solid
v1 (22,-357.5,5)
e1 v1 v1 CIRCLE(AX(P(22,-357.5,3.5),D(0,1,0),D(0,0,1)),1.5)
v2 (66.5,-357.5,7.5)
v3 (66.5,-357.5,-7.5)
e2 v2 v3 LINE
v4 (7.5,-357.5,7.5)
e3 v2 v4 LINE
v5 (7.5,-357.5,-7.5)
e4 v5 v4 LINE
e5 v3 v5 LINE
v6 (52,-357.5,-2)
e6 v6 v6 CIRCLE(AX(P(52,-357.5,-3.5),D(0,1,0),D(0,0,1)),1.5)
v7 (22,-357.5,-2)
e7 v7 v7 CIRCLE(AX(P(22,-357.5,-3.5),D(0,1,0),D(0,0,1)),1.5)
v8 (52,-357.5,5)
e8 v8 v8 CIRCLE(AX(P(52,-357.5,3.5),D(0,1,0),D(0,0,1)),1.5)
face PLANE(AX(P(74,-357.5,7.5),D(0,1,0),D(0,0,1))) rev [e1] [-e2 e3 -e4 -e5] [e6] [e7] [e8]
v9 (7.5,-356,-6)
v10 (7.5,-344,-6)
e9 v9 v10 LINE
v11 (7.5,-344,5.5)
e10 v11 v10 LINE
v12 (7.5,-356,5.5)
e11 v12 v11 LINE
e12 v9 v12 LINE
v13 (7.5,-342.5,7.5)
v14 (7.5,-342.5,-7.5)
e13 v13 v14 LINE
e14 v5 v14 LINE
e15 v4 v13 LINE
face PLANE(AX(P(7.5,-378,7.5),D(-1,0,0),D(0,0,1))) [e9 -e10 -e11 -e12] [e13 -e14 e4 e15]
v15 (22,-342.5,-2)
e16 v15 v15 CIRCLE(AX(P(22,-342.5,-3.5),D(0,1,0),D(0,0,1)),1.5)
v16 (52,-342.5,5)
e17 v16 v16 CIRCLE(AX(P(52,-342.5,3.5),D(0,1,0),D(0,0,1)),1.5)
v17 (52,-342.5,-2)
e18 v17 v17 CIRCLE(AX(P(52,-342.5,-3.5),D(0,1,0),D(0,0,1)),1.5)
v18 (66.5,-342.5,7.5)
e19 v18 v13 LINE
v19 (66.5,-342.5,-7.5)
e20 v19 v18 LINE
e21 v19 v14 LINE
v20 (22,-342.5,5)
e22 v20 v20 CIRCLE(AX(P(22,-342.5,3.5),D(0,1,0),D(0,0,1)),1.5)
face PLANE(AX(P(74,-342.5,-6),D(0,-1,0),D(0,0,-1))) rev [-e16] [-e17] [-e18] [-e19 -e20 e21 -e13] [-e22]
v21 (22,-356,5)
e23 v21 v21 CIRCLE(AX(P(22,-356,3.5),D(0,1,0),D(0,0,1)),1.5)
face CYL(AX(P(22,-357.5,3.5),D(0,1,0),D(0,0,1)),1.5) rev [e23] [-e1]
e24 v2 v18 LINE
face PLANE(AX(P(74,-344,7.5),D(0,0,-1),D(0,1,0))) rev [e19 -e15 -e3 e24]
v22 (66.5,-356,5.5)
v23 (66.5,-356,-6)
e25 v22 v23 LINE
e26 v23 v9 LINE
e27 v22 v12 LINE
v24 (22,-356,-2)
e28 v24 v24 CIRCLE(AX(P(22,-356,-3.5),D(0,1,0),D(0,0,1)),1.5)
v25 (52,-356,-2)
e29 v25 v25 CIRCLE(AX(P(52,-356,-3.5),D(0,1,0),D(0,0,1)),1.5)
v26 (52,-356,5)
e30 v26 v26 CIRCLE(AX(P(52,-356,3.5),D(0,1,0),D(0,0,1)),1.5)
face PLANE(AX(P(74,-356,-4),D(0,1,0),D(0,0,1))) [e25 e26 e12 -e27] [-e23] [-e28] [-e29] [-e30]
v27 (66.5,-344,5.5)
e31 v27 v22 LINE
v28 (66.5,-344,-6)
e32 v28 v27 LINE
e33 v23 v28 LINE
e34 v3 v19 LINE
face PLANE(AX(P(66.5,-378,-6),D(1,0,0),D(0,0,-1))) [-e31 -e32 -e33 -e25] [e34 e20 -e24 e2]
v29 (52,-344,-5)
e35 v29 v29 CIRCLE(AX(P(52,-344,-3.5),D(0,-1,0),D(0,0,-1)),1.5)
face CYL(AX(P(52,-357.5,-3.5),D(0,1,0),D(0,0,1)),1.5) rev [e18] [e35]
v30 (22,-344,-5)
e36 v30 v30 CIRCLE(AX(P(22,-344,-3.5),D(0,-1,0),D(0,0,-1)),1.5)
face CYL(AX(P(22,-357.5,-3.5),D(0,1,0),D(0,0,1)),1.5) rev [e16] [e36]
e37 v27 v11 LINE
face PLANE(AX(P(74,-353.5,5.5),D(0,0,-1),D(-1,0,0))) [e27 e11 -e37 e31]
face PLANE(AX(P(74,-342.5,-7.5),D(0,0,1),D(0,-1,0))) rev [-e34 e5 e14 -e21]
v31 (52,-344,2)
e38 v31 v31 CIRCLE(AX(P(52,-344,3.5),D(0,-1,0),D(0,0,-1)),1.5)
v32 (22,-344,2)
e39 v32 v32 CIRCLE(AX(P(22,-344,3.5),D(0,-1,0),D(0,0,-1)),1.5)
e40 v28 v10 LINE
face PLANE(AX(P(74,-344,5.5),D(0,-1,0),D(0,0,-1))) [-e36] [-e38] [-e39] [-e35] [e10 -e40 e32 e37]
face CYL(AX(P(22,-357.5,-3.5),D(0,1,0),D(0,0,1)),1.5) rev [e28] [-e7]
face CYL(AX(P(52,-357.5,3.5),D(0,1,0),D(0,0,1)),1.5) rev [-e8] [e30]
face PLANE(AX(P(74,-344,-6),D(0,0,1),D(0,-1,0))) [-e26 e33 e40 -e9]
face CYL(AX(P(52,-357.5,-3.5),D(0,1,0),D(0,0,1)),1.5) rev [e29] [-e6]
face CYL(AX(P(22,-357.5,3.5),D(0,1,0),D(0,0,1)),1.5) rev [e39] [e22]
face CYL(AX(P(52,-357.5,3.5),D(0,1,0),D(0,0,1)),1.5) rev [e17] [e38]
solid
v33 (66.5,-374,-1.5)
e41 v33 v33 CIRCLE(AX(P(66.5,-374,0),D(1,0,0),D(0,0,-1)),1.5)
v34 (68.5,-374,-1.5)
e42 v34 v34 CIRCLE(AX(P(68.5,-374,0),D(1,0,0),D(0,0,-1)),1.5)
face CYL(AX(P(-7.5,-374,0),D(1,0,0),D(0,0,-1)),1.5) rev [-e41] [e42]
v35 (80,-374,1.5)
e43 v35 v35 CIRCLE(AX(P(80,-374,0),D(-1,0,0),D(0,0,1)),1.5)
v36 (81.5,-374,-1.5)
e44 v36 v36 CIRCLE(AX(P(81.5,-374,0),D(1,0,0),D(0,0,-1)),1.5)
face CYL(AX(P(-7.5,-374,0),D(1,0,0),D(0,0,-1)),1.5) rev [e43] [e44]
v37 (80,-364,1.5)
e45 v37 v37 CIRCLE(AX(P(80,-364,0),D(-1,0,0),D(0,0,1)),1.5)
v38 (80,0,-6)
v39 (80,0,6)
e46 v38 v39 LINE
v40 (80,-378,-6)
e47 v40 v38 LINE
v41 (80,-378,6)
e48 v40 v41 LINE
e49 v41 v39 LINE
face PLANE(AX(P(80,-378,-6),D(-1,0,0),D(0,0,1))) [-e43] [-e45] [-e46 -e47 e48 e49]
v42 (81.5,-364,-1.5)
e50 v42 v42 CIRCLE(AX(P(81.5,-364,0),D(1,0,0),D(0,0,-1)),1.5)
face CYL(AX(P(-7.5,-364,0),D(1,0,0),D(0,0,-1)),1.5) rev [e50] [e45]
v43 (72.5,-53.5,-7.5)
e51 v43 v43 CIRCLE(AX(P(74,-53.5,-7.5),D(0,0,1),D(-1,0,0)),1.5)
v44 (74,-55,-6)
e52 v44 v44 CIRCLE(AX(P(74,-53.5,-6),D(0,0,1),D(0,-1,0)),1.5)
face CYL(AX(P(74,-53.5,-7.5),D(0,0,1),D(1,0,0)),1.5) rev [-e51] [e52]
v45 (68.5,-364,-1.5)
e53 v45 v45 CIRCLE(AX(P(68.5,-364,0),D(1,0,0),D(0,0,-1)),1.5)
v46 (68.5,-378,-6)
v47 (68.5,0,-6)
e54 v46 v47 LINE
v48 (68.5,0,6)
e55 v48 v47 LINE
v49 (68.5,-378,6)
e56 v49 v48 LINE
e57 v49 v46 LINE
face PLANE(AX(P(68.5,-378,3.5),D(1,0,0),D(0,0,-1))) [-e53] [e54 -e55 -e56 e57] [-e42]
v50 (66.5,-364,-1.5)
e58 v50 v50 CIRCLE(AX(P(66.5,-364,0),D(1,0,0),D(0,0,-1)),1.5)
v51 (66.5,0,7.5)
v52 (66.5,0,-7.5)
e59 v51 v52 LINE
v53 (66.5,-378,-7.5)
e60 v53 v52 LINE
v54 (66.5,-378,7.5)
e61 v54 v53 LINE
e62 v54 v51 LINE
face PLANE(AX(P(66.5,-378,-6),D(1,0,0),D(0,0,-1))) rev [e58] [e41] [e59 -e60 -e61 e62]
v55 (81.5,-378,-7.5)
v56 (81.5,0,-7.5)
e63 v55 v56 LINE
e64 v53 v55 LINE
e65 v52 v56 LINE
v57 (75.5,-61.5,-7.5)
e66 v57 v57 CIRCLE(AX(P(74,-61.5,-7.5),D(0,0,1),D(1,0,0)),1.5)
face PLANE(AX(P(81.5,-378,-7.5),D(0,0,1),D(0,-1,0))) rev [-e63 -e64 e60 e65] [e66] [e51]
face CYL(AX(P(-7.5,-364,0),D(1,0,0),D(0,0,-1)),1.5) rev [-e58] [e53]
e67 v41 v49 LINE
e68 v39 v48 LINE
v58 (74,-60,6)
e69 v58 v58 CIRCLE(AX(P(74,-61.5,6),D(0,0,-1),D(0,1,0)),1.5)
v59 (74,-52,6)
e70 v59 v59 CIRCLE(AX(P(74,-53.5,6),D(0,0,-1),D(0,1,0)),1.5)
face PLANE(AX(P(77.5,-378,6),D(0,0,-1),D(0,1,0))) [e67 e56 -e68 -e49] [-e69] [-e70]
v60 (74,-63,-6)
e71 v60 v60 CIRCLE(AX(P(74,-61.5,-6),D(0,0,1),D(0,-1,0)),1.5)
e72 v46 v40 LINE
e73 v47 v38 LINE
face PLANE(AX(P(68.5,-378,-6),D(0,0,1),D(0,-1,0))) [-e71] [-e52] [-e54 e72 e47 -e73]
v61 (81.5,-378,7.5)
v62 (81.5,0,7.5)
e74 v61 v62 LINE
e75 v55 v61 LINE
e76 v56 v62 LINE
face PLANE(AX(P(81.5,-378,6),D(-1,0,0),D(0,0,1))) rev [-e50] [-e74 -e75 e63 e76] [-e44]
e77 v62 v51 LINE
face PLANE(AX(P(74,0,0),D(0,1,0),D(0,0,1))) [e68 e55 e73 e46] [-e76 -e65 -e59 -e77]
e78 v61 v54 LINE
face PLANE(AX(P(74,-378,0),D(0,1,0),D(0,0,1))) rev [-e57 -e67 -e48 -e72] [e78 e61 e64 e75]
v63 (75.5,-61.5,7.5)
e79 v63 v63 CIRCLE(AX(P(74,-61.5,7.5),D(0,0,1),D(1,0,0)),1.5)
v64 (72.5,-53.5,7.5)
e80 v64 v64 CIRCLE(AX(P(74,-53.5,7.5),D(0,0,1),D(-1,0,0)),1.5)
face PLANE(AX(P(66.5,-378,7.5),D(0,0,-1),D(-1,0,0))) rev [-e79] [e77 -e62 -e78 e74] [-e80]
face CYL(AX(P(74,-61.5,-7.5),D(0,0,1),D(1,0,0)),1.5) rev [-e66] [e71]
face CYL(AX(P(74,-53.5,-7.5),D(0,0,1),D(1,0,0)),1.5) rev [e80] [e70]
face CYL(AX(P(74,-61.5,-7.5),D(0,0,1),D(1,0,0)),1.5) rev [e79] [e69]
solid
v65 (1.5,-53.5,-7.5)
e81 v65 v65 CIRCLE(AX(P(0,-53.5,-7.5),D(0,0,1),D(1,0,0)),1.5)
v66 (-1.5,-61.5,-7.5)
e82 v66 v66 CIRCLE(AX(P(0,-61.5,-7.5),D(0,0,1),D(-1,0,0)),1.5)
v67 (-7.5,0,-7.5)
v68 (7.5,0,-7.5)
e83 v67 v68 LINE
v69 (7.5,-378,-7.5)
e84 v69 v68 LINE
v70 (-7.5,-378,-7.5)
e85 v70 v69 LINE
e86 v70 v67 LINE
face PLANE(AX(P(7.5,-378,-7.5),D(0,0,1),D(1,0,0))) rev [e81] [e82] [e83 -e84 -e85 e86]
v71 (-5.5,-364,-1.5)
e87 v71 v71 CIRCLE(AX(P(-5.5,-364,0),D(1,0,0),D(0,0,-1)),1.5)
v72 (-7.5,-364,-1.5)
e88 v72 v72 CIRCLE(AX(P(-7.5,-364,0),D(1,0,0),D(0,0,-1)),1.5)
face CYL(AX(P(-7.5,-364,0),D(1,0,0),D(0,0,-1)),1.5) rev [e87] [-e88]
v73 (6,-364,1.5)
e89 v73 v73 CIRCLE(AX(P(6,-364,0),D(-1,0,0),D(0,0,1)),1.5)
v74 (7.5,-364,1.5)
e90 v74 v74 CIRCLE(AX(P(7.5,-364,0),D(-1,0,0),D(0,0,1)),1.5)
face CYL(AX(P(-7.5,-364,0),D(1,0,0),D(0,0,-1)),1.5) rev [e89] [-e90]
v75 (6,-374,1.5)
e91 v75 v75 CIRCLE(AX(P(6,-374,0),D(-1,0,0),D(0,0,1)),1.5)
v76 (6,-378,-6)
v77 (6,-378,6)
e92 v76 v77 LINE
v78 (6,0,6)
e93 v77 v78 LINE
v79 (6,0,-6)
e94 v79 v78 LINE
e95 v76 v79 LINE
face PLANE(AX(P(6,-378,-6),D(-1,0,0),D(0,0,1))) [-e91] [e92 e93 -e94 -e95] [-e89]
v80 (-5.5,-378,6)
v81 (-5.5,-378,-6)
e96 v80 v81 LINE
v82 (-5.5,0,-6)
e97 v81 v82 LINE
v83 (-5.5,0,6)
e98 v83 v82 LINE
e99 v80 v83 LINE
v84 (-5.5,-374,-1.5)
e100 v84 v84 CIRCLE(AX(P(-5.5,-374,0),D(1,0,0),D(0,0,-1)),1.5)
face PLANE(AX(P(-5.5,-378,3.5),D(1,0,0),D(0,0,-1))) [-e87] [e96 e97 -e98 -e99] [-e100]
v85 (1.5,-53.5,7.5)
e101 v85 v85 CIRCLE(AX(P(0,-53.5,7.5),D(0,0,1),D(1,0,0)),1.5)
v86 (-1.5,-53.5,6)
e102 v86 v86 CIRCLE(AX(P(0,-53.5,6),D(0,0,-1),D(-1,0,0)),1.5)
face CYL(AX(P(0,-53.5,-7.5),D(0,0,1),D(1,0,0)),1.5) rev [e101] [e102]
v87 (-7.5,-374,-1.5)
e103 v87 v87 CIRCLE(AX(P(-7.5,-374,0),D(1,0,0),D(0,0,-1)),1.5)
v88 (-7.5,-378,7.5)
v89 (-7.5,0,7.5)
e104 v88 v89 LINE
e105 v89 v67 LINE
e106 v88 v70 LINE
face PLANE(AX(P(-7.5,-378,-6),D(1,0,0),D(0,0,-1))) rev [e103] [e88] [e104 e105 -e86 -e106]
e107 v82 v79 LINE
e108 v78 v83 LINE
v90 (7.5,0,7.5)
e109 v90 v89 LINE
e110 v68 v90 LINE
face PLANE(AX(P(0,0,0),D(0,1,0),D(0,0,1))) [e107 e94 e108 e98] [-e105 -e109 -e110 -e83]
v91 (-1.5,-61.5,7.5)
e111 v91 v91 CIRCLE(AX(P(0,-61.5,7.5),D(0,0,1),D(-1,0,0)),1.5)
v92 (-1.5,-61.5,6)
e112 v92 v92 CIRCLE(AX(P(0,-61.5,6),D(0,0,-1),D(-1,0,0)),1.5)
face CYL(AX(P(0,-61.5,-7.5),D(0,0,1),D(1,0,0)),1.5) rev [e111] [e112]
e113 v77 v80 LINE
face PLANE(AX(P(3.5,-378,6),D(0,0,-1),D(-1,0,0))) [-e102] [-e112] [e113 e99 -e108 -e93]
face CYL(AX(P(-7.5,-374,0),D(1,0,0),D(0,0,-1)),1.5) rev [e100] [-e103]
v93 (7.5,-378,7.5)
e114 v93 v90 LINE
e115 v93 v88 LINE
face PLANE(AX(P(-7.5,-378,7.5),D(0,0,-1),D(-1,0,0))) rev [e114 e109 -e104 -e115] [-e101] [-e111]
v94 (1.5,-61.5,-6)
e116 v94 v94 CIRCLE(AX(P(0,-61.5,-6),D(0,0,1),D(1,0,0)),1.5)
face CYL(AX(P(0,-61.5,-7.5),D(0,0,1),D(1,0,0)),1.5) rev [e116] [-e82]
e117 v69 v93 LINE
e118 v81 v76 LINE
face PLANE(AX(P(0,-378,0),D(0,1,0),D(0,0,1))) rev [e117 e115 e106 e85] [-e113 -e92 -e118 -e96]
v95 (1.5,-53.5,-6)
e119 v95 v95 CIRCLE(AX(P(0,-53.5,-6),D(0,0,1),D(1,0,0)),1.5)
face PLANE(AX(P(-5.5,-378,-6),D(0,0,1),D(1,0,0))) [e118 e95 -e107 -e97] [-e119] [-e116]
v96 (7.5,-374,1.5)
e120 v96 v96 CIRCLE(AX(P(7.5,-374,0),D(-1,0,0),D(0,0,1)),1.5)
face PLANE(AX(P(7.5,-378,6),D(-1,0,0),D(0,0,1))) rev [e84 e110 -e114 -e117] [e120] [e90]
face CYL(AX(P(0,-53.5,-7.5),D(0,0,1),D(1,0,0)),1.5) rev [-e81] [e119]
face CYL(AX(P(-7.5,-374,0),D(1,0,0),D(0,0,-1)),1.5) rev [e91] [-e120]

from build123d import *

# Parameters (mm, degrees)
MEMBER_START                     = -357.5
MEMBER_15_15_1_5_1_OUTLINE_W     = 59
MEMBER_15_15_1_5_1_OUTLINE_H     = 1.5
MEMBER_15_15_1_5_1_OUTLINE_H_2   = 2
MEMBER_15_15_1_5_1_DEPTH         = 15
MEMBER_15_15_1_5_1_2_OUTLINE_W   = 59
MEMBER_15_15_1_5_1_2_OUTLINE_H   = 11.5
MEMBER_15_15_1_5_1_2_DEPTH       = 1.5
MEMBER_START_2                   = -344
MEMBER_15_15_1_5_1_3_OUTLINE_W   = 59
MEMBER_15_15_1_5_1_3_OUTLINE_H   = 11.5
MEMBER_15_15_1_5_1_3_DEPTH       = 1.5
MEMBER_START_3                   = -7.5
MEMBER_15_15_1_5_1_4_OUTLINE_W   = 1.5
MEMBER_15_15_1_5_1_4_OUTLINE_H   = 378
MEMBER_15_15_1_5_1_4_OUTLINE_W_2 = 2
MEMBER_15_15_1_5_1_4_DEPTH       = 15
MEMBER_15_15_1_5_1_5_OUTLINE_W   = 11.5
MEMBER_15_15_1_5_1_5_OUTLINE_H   = 378
MEMBER_15_15_1_5_1_5_DEPTH       = 1.5
MEMBER_START_4                   = 6
MEMBER_15_15_1_5_1_6_OUTLINE_W   = 11.5
MEMBER_15_15_1_5_1_6_OUTLINE_H   = 378
MEMBER_15_15_1_5_1_6_DEPTH       = 1.5
MEMBER_15_15_1_5_1_7_OUTLINE_W   = 1.5
MEMBER_15_15_1_5_1_7_OUTLINE_H   = 378
MEMBER_15_15_1_5_1_7_OUTLINE_W_2 = 2
MEMBER_15_15_1_5_1_7_DEPTH       = 15
MEMBER_15_15_1_5_1_8_OUTLINE_W   = 11.5
MEMBER_15_15_1_5_1_8_OUTLINE_H   = 378
MEMBER_15_15_1_5_1_8_DEPTH       = 1.5
MEMBER_15_15_1_5_1_9_OUTLINE_W   = 11.5
MEMBER_15_15_1_5_1_9_OUTLINE_H   = 378
MEMBER_15_15_1_5_1_9_DEPTH       = 1.5
SKETCH_2_R                       = 1.5
CUT_EXTRUDE_1_DEPTH              = 389.40861216
SKETCH_4_R                       = 1.5
CUT_EXTRUDE_2_DEPTH              = 15
SKETCH_5_R                       = 1.5
CUT_EXTRUDE_3_DEPTH              = 387.977066504


# Read off the part's stored shape, not the designer's step: 方形管 15 ×15× 1.5(1)
with BuildPart() as part:
    # Member 15 _15_ 1.5_1 outline → Member 15 _15_ 1.5_1 (new body)
    with BuildSketch(Plane(origin=(0, 0, 0), x_dir=(1, 0, 0), z_dir=(0, 1, 0)).offset(MEMBER_START)):
        with Locations((37, 6.75)):
            Rectangle(MEMBER_15_15_1_5_1_OUTLINE_W, MEMBER_15_15_1_5_1_OUTLINE_H)
        with Locations((37, -6.5)):
            Rectangle(MEMBER_15_15_1_5_1_OUTLINE_W, MEMBER_15_15_1_5_1_OUTLINE_H_2)
    extrude(amount=MEMBER_15_15_1_5_1_DEPTH)

    # Member 15 _15_ 1.5_1 2 outline → Member 15 _15_ 1.5_1 2 (add)
    with BuildSketch(Plane(origin=(0, 0, 0), x_dir=(1, 0, 0), z_dir=(0, 1, 0)).offset(MEMBER_START)):
        with Locations((37, 0.25)):
            Rectangle(MEMBER_15_15_1_5_1_2_OUTLINE_W, MEMBER_15_15_1_5_1_2_OUTLINE_H)
    extrude(amount=MEMBER_15_15_1_5_1_2_DEPTH)

    # Member 15 _15_ 1.5_1 3 outline → Member 15 _15_ 1.5_1 3 (add)
    with BuildSketch(Plane(origin=(0, 0, 0), x_dir=(1, 0, 0), z_dir=(0, 1, 0)).offset(MEMBER_START_2)):
        with Locations((37, 0.25)):
            Rectangle(MEMBER_15_15_1_5_1_3_OUTLINE_W, MEMBER_15_15_1_5_1_3_OUTLINE_H)
    extrude(amount=MEMBER_15_15_1_5_1_3_DEPTH)

    # 草图4 → 切除-拉伸2 (cut)
    with BuildSketch(Plane(origin=(0, -342.5, 0), x_dir=(1, 0, 0), z_dir=(0, 1, 0))):
        with Locations(Location((22, 3.5, 0), (0, 0, 270))):
            Circle(SKETCH_4_R)
        with Locations(Location((22, -3.5, 0), (0, 0, 270))):
            Circle(SKETCH_4_R)
        with Locations(Location((52, -3.5, 0), (0, 0, 270))):
            Circle(SKETCH_4_R)
        with Locations(Location((52, 3.5, 0), (0, 0, 270))):
            Circle(SKETCH_4_R)
    extrude(amount=-CUT_EXTRUDE_2_DEPTH, mode=Mode.SUBTRACT)


with BuildPart() as body_2:
    # Member 15 _15_ 1.5_1 4 outline → Member 15 _15_ 1.5_1 4 (new body)
    with BuildSketch(Plane.XY.offset(MEMBER_START_3)):
        with Locations((80.75, -189)):
            Rectangle(MEMBER_15_15_1_5_1_4_OUTLINE_W, MEMBER_15_15_1_5_1_4_OUTLINE_H)
        with Locations((67.5, -189)):
            Rectangle(MEMBER_15_15_1_5_1_4_OUTLINE_W_2, MEMBER_15_15_1_5_1_4_OUTLINE_H)
    extrude(amount=MEMBER_15_15_1_5_1_4_DEPTH)

    # Member 15 _15_ 1.5_1 5 outline → Member 15 _15_ 1.5_1 5 (add)
    with BuildSketch(Plane.XY.offset(MEMBER_START_3)):
        with Locations((74.25, -189)):
            Rectangle(MEMBER_15_15_1_5_1_5_OUTLINE_W, MEMBER_15_15_1_5_1_5_OUTLINE_H)
    extrude(amount=MEMBER_15_15_1_5_1_5_DEPTH)

    # Member 15 _15_ 1.5_1 6 outline → Member 15 _15_ 1.5_1 6 (add)
    with BuildSketch(Plane.XY.offset(MEMBER_START_4)):
        with Locations((74.25, -189)):
            Rectangle(MEMBER_15_15_1_5_1_6_OUTLINE_W, MEMBER_15_15_1_5_1_6_OUTLINE_H)
    extrude(amount=MEMBER_15_15_1_5_1_6_DEPTH)


with BuildPart() as body_3:
    # Member 15 _15_ 1.5_1 7 outline → Member 15 _15_ 1.5_1 7 (new body)
    with BuildSketch(Plane.XY.offset(MEMBER_START_3)):
        with Locations((6.75, -189)):
            Rectangle(MEMBER_15_15_1_5_1_7_OUTLINE_W, MEMBER_15_15_1_5_1_7_OUTLINE_H)
        with Locations((-6.5, -189)):
            Rectangle(MEMBER_15_15_1_5_1_7_OUTLINE_W_2, MEMBER_15_15_1_5_1_7_OUTLINE_H)
    extrude(amount=MEMBER_15_15_1_5_1_7_DEPTH)

    # Member 15 _15_ 1.5_1 8 outline → Member 15 _15_ 1.5_1 8 (add)
    with BuildSketch(Plane.XY.offset(MEMBER_START_3)):
        with Locations((0.25, -189)):
            Rectangle(MEMBER_15_15_1_5_1_8_OUTLINE_W, MEMBER_15_15_1_5_1_8_OUTLINE_H)
    extrude(amount=MEMBER_15_15_1_5_1_8_DEPTH)

    # Member 15 _15_ 1.5_1 9 outline → Member 15 _15_ 1.5_1 9 (add)
    with BuildSketch(Plane.XY.offset(MEMBER_START_4)):
        with Locations((0.25, -189)):
            Rectangle(MEMBER_15_15_1_5_1_9_OUTLINE_W, MEMBER_15_15_1_5_1_9_OUTLINE_H)
    extrude(amount=MEMBER_15_15_1_5_1_9_DEPTH)


with BuildPart() as cut_extrude_1_tool:
    # 草图2 → 切除-拉伸1 (new, through all)
    with BuildSketch(Plane(origin=(81.5, 0, 0), x_dir=(0, 0, -1), z_dir=(1, 0, 0))):
        with Locations((0, -364)):
            Circle(SKETCH_2_R)
        with Locations((0, -374)):
            Circle(SKETCH_2_R)
    extrude(amount=-CUT_EXTRUDE_1_DEPTH)


with BuildPart() as body_2_1:
    add(body_2.part)

    # 切除-拉伸1: cut by cut_extrude_1_tool
    add(cut_extrude_1_tool.part, mode=Mode.SUBTRACT)


with BuildPart() as body_3_1:
    add(body_3.part)

    # 切除-拉伸1: cut by cut_extrude_1_tool
    add(cut_extrude_1_tool.part, mode=Mode.SUBTRACT)


with BuildPart() as cut_extrude_3_tool:
    # 草图5 → 切除-拉伸3 (new, through all)
    with BuildSketch(Plane.XY.offset(7.5)):
        with Locations((0, -53.5)):
            Circle(SKETCH_5_R)
        with Locations((0, -61.5)):
            Circle(SKETCH_5_R)
        with Locations((74, -61.5)):
            Circle(SKETCH_5_R)
        with Locations(Location((74, -53.5, 0), (0, 0, 270))):
            Circle(SKETCH_5_R)
    extrude(amount=-CUT_EXTRUDE_3_DEPTH)


with BuildPart() as body_2_2:
    add(body_2_1.part)

    # 切除-拉伸3: cut by cut_extrude_3_tool
    add(cut_extrude_3_tool.part, mode=Mode.SUBTRACT)


with BuildPart() as body_3_2:
    add(body_3_1.part)

    # 切除-拉伸3: cut by cut_extrude_3_tool
    add(cut_extrude_3_tool.part, mode=Mode.SUBTRACT)


solid = Compound([part.part, body_2_2.part, body_3_2.part])
